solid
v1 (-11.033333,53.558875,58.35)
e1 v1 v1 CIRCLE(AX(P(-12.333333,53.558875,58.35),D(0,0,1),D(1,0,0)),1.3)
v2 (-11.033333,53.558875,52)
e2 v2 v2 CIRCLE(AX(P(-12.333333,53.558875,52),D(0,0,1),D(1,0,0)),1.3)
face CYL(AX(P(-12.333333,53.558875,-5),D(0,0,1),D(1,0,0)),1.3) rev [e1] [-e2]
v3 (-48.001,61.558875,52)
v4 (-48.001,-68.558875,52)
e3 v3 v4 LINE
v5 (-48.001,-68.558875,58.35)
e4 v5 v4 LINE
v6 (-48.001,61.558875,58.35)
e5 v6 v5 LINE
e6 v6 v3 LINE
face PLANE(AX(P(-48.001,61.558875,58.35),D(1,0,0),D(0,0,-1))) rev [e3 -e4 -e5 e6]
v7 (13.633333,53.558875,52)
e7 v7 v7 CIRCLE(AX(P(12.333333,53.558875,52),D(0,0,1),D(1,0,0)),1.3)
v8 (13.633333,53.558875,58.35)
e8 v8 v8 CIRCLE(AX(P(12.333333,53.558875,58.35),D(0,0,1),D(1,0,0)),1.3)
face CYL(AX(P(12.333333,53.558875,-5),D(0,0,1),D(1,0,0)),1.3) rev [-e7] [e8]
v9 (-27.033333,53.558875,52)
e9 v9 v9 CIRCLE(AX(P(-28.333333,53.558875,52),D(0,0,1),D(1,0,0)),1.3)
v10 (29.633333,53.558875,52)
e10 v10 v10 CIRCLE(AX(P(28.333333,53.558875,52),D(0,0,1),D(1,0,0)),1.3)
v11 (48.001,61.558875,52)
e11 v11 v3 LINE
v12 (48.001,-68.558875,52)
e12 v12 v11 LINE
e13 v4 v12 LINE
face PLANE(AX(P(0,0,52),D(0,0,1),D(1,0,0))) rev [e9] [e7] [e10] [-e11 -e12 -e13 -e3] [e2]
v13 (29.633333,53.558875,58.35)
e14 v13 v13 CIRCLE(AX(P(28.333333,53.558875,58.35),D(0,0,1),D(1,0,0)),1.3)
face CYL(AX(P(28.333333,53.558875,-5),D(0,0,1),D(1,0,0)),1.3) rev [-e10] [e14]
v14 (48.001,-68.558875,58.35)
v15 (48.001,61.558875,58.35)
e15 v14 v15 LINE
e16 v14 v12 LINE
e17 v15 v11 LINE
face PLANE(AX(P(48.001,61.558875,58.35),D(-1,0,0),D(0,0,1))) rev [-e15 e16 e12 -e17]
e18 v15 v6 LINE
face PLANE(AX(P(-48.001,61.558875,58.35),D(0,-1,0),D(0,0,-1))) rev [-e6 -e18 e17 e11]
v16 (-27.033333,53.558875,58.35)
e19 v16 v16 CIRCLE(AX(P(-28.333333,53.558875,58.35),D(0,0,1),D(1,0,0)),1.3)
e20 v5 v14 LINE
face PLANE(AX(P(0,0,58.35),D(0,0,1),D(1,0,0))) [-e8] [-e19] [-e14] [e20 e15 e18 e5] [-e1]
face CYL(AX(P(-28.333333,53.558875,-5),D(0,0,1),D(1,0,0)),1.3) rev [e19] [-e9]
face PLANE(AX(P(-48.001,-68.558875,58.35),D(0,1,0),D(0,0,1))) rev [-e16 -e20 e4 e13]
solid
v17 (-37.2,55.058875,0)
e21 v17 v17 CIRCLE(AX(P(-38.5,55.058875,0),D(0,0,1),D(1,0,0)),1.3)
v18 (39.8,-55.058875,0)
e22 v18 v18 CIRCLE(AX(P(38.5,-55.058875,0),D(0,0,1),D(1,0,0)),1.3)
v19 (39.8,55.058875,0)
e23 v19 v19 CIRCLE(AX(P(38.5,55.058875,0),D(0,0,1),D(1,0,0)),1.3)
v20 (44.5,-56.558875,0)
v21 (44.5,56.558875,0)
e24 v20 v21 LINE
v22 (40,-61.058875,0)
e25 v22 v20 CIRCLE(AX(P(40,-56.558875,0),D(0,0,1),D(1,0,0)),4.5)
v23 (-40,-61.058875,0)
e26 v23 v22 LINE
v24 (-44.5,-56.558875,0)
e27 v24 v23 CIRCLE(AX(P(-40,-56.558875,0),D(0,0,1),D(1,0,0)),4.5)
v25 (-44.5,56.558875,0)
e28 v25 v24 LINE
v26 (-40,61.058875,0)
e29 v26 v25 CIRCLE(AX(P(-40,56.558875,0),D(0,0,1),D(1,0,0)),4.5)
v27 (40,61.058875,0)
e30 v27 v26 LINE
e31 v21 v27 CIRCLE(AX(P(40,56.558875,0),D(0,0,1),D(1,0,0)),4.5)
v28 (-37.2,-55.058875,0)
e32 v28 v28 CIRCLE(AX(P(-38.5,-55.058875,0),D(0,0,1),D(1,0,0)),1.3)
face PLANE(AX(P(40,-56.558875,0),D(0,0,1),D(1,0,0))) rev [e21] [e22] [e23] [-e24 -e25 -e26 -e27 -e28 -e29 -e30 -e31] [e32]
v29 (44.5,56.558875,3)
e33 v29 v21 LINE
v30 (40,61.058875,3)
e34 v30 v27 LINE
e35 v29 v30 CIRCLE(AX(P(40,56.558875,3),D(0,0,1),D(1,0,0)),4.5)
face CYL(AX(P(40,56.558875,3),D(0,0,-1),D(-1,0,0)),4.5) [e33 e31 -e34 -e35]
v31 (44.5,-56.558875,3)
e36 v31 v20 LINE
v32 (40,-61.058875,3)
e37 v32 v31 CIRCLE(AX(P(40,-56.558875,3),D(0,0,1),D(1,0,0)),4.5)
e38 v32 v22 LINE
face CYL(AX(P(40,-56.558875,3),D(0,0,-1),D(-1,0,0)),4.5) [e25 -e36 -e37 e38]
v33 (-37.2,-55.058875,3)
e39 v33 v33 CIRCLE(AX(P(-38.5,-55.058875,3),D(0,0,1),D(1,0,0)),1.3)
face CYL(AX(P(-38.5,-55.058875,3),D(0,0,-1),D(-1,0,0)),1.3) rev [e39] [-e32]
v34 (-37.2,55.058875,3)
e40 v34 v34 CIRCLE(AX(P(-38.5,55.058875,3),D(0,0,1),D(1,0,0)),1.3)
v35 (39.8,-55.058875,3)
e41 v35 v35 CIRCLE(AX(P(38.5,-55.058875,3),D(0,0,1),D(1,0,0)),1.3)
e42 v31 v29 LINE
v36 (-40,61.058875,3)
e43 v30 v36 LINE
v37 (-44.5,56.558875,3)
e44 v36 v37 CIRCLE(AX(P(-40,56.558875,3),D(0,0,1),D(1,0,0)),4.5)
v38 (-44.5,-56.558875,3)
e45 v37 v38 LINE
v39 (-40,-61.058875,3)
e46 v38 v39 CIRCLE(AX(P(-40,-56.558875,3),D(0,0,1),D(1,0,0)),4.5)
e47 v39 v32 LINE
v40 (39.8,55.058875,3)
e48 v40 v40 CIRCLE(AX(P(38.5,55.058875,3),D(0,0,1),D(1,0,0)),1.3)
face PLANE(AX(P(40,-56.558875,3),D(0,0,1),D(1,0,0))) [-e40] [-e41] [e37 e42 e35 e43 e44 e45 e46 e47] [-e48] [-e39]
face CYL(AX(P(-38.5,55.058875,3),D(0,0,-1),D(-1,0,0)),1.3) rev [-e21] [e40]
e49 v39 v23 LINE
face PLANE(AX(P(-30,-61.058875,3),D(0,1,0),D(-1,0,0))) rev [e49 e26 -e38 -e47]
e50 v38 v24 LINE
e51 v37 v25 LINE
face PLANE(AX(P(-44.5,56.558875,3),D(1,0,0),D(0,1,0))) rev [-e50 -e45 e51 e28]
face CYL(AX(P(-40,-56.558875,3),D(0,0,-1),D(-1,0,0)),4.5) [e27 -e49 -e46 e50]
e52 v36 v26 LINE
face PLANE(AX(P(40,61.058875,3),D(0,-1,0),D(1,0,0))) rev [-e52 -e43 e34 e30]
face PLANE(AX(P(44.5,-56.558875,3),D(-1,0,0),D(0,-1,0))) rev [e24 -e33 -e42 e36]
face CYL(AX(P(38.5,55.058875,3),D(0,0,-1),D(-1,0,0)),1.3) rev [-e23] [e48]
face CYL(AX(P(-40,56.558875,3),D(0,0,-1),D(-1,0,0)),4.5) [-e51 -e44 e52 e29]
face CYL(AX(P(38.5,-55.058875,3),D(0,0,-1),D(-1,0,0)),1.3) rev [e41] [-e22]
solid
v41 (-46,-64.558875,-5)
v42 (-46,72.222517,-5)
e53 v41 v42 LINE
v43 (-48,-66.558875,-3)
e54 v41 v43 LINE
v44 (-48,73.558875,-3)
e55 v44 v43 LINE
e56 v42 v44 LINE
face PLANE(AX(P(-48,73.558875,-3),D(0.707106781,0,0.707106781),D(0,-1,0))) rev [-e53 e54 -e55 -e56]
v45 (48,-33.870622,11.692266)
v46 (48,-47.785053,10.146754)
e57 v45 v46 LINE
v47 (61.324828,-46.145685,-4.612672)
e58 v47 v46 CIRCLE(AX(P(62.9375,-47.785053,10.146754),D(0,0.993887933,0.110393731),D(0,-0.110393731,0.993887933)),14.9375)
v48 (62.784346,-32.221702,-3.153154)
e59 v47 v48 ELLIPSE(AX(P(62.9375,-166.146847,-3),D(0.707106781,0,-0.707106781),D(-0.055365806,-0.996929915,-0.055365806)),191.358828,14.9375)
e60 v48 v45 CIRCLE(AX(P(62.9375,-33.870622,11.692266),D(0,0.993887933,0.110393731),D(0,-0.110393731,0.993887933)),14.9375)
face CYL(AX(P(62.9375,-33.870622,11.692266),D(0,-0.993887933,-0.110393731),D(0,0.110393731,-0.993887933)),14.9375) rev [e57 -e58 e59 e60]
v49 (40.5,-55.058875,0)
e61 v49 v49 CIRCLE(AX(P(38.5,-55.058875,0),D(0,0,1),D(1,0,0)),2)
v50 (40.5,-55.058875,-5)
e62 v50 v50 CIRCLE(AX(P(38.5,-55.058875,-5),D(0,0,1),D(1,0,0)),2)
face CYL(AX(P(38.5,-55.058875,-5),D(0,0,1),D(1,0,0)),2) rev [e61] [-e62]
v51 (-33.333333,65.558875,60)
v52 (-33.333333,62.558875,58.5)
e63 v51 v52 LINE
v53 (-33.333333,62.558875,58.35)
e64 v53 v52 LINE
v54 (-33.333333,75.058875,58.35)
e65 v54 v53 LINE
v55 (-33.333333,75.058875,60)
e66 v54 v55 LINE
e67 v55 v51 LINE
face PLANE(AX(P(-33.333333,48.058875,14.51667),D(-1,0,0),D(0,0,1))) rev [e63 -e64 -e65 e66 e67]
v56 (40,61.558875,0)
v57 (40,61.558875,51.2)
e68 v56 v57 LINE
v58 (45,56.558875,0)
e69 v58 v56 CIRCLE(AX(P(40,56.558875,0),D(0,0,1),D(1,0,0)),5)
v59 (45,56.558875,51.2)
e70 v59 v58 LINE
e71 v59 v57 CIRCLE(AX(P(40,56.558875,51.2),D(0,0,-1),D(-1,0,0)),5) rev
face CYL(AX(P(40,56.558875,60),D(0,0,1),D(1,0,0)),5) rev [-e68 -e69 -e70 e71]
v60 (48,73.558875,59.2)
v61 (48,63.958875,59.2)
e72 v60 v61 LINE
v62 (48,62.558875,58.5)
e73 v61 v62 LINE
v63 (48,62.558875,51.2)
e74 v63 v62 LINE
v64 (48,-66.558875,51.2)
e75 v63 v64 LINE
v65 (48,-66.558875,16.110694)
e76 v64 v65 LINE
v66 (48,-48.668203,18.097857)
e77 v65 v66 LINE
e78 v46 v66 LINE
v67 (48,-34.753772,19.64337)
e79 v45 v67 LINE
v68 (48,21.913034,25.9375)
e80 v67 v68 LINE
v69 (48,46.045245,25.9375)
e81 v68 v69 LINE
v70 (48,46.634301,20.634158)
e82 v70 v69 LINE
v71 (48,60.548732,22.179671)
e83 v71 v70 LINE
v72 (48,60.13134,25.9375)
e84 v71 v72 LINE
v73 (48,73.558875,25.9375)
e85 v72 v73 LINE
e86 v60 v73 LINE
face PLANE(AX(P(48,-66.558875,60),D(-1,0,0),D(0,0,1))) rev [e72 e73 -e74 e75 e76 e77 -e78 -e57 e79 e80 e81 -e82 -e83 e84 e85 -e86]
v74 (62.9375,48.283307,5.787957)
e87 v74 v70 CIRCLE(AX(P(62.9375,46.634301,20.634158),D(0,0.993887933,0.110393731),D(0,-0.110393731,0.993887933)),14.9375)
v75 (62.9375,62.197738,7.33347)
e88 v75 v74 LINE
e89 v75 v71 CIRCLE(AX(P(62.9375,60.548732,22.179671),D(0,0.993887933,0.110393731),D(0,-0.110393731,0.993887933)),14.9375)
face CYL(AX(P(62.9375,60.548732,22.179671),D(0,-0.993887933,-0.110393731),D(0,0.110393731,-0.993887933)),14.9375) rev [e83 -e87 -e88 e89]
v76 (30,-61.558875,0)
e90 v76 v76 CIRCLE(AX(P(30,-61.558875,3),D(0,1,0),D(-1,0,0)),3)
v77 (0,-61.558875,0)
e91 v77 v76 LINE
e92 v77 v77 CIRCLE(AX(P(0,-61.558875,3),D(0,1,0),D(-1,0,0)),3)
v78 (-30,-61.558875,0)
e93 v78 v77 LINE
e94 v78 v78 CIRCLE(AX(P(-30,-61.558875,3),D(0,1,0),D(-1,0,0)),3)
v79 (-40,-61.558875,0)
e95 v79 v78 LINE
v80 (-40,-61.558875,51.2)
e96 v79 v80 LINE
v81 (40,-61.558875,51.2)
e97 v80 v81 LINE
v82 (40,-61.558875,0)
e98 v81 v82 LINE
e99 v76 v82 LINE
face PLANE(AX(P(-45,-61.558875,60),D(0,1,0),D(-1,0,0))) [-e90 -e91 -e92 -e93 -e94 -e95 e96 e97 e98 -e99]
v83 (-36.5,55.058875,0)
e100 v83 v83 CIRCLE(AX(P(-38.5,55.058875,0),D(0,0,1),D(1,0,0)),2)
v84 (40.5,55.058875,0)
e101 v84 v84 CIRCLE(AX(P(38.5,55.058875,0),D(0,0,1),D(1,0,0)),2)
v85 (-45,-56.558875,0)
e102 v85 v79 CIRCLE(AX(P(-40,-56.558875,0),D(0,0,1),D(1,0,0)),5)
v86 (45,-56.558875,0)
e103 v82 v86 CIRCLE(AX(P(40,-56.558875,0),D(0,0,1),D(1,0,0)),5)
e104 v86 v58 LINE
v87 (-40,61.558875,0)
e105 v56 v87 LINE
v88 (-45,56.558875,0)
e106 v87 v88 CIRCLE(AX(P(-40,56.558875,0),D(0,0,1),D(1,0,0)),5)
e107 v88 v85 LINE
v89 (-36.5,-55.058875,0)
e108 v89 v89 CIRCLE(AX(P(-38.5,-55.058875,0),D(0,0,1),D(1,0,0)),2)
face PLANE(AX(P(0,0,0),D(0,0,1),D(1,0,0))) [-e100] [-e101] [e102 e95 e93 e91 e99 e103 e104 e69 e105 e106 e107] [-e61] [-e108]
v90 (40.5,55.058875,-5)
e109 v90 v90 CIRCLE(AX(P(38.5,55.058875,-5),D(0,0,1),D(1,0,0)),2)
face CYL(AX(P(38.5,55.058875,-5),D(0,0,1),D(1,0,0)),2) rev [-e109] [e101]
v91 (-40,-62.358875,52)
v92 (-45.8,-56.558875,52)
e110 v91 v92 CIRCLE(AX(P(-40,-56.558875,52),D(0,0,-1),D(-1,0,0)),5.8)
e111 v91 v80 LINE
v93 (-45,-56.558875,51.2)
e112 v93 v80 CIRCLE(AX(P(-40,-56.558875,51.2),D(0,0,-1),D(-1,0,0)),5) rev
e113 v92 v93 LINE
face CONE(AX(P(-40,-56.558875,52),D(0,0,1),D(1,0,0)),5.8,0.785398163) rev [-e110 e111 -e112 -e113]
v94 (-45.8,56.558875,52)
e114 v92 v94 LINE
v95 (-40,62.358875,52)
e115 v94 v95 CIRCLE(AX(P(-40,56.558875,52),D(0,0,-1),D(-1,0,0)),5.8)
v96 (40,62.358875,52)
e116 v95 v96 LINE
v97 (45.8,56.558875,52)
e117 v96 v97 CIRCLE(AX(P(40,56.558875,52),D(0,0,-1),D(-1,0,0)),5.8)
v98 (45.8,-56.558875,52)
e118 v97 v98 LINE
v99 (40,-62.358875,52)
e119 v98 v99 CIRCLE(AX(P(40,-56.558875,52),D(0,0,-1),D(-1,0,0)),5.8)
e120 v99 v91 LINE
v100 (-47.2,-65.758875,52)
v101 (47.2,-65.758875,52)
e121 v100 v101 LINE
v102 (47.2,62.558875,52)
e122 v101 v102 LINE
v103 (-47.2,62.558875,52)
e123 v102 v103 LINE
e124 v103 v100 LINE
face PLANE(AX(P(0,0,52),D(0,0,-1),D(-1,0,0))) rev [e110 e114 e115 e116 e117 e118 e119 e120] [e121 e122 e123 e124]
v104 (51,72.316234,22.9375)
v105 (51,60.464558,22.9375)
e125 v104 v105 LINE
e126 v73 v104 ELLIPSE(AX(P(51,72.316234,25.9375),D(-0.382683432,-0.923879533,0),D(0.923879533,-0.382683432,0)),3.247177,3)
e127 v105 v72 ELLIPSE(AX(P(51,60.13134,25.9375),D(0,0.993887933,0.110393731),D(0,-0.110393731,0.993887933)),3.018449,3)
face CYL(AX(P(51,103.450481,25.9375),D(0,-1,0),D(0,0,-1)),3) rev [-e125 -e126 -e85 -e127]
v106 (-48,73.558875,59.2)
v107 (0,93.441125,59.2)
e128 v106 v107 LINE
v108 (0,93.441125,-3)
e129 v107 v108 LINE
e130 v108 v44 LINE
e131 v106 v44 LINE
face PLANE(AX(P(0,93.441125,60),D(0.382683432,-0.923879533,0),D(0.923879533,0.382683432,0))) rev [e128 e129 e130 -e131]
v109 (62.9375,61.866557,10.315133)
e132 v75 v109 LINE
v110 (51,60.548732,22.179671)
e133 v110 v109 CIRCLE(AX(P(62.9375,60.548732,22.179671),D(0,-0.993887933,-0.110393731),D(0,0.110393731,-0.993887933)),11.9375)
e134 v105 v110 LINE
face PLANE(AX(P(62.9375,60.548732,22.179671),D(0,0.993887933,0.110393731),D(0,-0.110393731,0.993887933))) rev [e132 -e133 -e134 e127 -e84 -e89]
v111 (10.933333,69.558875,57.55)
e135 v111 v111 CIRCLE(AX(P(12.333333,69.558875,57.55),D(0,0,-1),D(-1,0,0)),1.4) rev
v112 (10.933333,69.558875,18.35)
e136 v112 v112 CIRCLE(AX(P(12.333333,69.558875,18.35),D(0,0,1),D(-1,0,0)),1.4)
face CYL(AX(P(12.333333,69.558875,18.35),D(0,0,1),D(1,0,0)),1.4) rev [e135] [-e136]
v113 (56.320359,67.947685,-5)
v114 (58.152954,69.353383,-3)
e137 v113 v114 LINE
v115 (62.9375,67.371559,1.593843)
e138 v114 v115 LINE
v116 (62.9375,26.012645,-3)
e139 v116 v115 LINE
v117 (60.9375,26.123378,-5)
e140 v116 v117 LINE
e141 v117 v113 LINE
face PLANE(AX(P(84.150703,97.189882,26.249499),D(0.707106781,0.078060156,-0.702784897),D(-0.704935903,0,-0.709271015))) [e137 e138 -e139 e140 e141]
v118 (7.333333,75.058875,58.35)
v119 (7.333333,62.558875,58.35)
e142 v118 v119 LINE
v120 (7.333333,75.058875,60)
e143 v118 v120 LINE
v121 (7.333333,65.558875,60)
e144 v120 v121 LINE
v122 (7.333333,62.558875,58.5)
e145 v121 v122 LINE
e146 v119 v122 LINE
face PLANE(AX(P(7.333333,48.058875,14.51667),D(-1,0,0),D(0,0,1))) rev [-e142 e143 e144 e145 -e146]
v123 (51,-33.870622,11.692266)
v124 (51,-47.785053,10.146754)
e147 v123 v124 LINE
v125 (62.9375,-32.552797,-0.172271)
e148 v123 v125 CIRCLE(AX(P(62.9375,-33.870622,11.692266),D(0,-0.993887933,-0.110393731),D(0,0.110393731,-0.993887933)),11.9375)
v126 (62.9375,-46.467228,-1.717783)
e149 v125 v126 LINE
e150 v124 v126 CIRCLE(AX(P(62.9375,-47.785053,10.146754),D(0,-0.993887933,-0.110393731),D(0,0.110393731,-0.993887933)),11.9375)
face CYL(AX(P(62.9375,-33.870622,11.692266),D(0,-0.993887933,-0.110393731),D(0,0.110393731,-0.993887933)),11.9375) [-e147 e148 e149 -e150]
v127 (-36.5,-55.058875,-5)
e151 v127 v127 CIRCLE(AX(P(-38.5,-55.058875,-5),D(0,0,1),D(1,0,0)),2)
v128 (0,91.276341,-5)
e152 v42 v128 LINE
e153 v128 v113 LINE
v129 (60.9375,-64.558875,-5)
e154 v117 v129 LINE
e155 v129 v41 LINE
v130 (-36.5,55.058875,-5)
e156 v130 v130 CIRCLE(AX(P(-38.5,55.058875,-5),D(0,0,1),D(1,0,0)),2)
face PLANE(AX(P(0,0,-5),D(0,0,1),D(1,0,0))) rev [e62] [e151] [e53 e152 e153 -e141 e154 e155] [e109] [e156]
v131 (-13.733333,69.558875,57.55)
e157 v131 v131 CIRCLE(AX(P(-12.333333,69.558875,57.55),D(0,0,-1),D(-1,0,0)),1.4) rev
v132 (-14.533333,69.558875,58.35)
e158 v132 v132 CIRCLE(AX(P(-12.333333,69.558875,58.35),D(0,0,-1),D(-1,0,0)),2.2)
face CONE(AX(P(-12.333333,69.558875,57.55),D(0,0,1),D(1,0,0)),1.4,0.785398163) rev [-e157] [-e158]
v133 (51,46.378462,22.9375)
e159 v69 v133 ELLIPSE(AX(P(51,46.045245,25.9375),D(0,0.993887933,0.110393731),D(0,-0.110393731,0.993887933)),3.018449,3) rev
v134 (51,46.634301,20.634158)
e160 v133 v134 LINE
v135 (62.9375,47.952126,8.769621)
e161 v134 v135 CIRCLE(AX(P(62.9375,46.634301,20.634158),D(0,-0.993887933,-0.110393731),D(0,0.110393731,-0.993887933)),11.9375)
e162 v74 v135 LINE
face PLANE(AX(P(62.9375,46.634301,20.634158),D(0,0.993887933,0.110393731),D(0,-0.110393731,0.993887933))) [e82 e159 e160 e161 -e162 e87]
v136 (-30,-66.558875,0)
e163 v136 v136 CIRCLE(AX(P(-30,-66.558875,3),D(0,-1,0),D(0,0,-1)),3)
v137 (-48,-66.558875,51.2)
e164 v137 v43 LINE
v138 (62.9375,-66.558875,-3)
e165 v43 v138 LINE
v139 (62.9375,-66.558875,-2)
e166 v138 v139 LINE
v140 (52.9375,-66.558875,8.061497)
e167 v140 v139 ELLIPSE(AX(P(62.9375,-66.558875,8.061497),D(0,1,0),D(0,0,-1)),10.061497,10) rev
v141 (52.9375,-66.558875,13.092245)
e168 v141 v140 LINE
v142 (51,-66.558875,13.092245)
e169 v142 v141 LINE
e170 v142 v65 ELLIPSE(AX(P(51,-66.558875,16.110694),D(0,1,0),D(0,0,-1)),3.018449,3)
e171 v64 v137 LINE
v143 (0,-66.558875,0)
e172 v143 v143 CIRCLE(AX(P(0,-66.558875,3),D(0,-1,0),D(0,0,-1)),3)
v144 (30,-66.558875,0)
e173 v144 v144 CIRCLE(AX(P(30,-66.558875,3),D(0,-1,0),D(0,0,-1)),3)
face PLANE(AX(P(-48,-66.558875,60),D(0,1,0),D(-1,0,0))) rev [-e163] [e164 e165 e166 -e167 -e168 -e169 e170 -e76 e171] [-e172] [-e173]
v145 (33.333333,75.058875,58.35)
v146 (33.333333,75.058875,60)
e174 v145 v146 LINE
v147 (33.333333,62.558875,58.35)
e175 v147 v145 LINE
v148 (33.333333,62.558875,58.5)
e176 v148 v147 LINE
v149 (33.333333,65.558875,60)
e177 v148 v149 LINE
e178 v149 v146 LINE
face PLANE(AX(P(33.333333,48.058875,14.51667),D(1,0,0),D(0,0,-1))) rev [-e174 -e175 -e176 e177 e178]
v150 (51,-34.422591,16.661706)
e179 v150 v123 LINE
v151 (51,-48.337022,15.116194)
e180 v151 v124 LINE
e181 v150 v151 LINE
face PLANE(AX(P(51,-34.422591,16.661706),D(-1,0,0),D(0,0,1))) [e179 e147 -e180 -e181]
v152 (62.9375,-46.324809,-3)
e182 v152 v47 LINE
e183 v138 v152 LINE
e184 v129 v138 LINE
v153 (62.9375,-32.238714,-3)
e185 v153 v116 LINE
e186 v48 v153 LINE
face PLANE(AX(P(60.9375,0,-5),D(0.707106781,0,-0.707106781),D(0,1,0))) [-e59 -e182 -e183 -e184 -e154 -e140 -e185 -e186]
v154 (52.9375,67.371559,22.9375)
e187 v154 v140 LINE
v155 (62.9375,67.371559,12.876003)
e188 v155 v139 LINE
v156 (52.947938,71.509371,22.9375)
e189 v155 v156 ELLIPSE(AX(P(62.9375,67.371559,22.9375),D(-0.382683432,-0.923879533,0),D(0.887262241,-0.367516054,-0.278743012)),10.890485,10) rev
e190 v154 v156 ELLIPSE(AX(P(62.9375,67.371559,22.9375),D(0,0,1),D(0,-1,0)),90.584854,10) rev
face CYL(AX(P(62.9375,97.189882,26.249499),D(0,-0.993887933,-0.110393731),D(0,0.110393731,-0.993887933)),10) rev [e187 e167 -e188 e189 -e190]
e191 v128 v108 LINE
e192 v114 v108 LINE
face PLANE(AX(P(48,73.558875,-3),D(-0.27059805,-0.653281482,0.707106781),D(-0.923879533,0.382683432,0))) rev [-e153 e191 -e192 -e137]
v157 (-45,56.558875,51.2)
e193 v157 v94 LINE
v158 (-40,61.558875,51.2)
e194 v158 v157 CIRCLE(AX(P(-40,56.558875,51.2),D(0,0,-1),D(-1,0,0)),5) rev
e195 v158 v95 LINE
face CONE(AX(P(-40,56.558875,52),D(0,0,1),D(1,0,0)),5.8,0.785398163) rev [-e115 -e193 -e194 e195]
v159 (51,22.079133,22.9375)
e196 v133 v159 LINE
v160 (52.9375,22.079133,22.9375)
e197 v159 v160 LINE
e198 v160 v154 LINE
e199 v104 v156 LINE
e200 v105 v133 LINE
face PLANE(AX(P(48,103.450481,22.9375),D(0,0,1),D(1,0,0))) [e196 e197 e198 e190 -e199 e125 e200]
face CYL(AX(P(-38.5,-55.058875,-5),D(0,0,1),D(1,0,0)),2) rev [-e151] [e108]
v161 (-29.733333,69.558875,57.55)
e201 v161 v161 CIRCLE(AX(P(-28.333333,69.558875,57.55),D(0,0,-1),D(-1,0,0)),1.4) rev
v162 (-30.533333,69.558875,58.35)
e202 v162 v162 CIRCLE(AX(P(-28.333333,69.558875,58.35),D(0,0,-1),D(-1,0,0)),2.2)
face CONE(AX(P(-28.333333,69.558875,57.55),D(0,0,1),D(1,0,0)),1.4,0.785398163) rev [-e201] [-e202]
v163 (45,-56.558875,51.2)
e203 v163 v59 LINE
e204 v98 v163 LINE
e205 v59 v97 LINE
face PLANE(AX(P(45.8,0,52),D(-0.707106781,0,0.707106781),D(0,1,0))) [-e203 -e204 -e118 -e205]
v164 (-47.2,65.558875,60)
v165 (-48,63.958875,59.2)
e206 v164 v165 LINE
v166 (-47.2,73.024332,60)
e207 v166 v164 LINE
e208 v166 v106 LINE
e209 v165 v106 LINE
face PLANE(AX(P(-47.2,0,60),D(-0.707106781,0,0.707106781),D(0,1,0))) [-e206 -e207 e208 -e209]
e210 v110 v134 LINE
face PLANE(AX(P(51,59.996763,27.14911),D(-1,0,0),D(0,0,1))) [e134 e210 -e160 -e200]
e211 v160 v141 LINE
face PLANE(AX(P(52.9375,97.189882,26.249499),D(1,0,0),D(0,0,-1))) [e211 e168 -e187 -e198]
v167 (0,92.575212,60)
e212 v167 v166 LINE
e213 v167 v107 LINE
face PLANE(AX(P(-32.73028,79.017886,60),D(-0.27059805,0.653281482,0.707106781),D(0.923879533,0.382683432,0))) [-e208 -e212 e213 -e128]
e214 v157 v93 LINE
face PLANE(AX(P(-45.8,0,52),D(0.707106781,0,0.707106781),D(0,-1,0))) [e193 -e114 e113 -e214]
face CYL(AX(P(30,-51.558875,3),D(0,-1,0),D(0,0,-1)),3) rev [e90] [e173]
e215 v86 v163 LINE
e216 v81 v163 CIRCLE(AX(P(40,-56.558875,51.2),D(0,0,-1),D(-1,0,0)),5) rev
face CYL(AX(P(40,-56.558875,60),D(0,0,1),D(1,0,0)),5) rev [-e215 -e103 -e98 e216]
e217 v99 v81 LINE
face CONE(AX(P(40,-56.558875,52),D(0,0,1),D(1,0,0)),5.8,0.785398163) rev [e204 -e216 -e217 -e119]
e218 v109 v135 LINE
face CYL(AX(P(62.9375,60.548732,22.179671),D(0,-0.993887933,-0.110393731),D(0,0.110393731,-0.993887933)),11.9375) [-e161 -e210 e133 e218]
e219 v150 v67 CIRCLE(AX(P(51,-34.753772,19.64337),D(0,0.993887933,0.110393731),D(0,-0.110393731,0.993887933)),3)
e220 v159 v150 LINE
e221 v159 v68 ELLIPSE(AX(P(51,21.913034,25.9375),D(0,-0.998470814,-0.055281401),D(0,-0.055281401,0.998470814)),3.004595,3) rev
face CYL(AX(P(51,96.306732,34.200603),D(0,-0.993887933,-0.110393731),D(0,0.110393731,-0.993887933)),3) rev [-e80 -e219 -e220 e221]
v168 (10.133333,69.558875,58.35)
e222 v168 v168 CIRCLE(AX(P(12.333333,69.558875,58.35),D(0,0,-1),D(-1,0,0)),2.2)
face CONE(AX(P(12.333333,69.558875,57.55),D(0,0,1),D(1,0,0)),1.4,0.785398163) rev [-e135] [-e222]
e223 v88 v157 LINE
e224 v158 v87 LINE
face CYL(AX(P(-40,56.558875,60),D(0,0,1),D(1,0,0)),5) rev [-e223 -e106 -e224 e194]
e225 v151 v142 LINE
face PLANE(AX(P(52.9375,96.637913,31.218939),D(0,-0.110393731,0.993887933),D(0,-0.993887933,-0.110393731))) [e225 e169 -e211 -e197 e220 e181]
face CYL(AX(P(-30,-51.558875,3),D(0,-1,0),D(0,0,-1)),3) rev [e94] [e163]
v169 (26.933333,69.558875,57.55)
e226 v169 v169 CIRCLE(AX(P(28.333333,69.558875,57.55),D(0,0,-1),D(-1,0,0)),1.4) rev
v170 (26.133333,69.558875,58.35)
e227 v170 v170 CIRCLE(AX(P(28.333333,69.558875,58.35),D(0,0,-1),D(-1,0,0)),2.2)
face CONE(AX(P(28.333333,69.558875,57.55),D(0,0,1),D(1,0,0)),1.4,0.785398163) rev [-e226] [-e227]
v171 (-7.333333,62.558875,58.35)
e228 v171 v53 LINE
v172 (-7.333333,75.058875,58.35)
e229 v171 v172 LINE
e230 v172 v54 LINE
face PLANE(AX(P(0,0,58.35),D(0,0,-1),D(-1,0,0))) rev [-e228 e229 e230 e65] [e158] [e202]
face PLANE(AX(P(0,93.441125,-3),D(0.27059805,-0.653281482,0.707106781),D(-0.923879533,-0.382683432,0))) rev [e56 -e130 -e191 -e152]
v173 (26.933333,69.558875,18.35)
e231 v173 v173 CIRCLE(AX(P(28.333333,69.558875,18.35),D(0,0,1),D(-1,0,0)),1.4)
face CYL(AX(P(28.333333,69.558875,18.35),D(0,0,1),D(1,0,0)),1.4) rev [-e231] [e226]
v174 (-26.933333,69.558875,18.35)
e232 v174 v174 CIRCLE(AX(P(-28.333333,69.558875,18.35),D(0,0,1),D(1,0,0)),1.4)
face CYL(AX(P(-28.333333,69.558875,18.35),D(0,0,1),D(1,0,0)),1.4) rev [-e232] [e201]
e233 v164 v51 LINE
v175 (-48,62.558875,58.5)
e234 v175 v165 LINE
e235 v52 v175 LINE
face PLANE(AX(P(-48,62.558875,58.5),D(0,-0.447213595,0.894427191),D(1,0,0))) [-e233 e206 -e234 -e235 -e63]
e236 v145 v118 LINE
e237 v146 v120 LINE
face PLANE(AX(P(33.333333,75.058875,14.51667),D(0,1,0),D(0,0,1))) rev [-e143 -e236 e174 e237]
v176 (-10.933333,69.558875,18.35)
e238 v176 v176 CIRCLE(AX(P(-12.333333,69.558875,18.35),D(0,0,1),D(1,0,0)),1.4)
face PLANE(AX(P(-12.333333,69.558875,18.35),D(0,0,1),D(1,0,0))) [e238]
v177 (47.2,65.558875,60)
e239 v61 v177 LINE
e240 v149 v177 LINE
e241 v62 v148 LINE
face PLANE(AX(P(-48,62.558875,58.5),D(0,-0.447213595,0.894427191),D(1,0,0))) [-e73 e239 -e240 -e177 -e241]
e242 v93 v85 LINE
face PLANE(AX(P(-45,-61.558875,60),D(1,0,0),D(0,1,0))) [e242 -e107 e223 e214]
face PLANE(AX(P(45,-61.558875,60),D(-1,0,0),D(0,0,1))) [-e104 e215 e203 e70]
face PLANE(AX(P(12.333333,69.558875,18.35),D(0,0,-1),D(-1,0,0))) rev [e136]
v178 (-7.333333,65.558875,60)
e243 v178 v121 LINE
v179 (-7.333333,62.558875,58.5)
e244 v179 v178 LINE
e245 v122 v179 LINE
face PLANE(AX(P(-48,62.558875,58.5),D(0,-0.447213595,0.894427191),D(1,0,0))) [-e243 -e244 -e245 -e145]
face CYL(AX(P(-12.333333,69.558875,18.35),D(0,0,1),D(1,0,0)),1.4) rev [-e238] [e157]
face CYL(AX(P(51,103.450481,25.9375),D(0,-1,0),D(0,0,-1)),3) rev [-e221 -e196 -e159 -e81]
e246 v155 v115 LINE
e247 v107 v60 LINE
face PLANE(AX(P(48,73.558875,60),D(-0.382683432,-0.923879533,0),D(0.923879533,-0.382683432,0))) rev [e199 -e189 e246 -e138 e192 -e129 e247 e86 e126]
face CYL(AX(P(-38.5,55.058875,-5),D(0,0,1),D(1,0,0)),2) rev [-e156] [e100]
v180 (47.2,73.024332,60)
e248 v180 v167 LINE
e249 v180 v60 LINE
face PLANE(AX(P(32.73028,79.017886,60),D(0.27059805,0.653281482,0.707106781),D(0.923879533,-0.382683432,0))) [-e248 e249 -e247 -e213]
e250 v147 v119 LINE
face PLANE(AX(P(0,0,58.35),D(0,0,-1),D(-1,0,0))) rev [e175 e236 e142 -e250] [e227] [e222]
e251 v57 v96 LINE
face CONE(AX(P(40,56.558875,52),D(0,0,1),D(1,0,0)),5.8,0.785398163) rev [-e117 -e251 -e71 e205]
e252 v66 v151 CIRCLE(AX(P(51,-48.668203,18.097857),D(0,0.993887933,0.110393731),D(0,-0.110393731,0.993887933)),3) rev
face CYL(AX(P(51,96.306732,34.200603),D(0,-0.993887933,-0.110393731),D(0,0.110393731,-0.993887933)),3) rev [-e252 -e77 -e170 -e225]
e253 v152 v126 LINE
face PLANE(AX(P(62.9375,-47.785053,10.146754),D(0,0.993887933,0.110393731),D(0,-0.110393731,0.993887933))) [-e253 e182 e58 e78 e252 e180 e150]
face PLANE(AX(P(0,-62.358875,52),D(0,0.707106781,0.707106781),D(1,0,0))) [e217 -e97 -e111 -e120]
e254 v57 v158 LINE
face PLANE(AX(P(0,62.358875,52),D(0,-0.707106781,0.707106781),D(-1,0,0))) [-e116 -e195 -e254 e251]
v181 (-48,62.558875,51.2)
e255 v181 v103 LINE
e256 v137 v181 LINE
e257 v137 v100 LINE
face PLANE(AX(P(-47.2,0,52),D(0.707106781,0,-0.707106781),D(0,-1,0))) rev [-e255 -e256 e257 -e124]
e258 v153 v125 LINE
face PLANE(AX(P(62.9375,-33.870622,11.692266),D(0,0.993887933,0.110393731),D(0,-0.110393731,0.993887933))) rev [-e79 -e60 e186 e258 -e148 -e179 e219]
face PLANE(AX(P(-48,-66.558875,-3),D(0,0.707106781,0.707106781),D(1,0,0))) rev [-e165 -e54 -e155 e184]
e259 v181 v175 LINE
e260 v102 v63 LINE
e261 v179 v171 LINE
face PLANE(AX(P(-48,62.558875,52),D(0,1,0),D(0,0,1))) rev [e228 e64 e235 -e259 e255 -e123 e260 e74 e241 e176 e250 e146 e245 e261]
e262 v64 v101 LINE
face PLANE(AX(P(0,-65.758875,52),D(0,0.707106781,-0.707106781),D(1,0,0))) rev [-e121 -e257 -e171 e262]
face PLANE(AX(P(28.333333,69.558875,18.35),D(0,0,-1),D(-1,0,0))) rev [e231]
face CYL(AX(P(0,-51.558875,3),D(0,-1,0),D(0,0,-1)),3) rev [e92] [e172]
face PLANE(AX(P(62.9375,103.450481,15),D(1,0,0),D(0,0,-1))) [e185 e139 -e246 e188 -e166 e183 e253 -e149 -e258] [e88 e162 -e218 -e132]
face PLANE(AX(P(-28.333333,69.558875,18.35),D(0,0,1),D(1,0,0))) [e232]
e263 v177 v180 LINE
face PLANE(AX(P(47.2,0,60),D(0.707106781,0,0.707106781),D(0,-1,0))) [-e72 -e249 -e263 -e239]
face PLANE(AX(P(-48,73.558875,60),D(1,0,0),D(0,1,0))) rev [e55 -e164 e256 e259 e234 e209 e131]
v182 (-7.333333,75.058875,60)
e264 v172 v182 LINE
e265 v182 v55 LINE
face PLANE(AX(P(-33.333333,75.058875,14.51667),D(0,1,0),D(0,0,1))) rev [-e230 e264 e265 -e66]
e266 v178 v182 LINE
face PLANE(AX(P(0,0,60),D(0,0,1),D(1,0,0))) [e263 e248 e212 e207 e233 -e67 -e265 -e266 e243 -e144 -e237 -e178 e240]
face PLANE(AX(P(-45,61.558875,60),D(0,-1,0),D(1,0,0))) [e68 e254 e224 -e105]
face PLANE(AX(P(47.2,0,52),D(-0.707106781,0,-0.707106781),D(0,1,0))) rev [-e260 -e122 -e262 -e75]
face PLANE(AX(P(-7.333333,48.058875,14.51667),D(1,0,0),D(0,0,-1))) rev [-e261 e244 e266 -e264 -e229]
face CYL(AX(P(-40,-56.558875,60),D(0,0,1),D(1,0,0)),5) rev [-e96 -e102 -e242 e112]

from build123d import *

# Parameters (mm, degrees)
SKETCH1_W               = 90
SKETCH1_H               = 123.117749006
MAIN_EXTRUDE_DEPTH      = 60
REAR_EXTRUDE_DEPTH      = 5
BOSS_EXTRUDE3_REACH     = 179.494
CUT_EXTRUDE9_DEPTH      = 203.415334916
CUT_EXTRUDE10_DEPTH     = 14
LPATTERN1_COUNT         = 2
LPATTERN1_PITCH         = 95
FILLET2_R               = 3
SKETCH9_R               = 3
INNER_DRAIN_HOLES_DEPTH = 15
CUT_EXTRUDE2_DEPTH      = 8
SKETCH5_W               = 26
SKETCH5_H               = 27
CUT_EXTRUDE3_DEPTH      = 1.65
SKETCH15_R              = 1.4
CUT_EXTRUDE7_DEPTH      = 40
SKETCH12_W              = 96.002
SKETCH12_H              = 130.117749006
BOSS_EXTRUDE5_DEPTH     = 6.35
SKETCH13_R              = 1.3
CUT_EXTRUDE8_DEPTH      = 130.250127042
CHAMFER4_SIZE           = 3
CHAMFER4_SIZE2          = 1.5
CHAMFER7_SIZE           = 0.8
CAVITY_FILLET_R         = 5
SKETCH21_R              = 1.3
BOSS_EXTRUDE10_DEPTH    = 3
SKETCH22_R              = 2
CUT_EXTRUDE11_DEPTH     = 128.641579591
CHAMFER6_SIZE           = 0.8
CHAMFER2_SIZE           = 2
CHAMFER9_SIZE           = 0.8


with BuildPart() as part:
    # Sketch1 → main-extrude (new body)
    with BuildSketch(Plane.XY):
        Polygon((-48, 73.558874503), (-48, -66.558874503), (48, -66.558874503), (48, 73.558874503), (0, 93.441125497), align=None)
        Rectangle(SKETCH1_W, SKETCH1_H, mode=Mode.SUBTRACT)
    extrude(amount=MAIN_EXTRUDE_DEPTH)

    # Sketch2 → rear-extrude (add)
    with BuildSketch(Plane.XY):
        Polygon((48, -66.558874503), (48, 73.558874503), (0, 93.441125497), (-48, 73.558874503), (-48, -66.558874503), align=None)
    extrude(amount=-REAR_EXTRUDE_DEPTH)

    # Boss-Extrude3: up to this plane
    boss_extrude3_end = Plane(origin=(48, 73.558874503, 60), z_dir=(-0.38268343236508395, -0.9238795325112892, 0))
    # Sketch6 → Boss-Extrude3 (add, up to the surface)
    with BuildSketch(Plane.XZ.offset(66.558874503), mode=Mode.PRIVATE) as boss_extrude3_sk1:
        Polygon((48, 22.9375), (52, 22.9375), (55, 22.9375), (62.9375, 22.9375), (62.9375, 15), (62.9375, -5), (48, -5), align=None)
    boss_extrude3_tool1 = split(extrude(boss_extrude3_sk1.sketch, amount=-BOSS_EXTRUDE3_REACH, mode=Mode.PRIVATE), bisect_by=boss_extrude3_end, keep=Keep.BOTH, mode=Mode.PRIVATE)
    add(boss_extrude3_tool1.solids().sort_by_distance((55.46875, -66.558875, 8.96875))[0])

    # Sketch20 → Cut-Extrude9 (cut, through all)
    with BuildSketch(Plane(origin=(62.9375, -67.662811816, 7.938879334), x_dir=(1, 0, 0), z_dir=(0, 0.9938879333627552, 0.11039373132524995))):
        with BuildLine():
            Line((10, 0), (10, -24.570160676))
            Line((10, -24.570160676), (-14.9375, -24.570160676))
            Line((-14.9375, -24.570160676), (-14.9375, -5))
            Line((-14.9375, -5), (-10, -5))
            Line((-10, -5), (-10, 0))
            ThreePointArc((-10, 0), (0, 10), (10, 0))
        make_face()
        Polygon((21.213203436, 0), (-21.213203436, 42.426406871), (21.213203436, 42.426406871), align=None)
    extrude(amount=CUT_EXTRUDE9_DEPTH, mode=Mode.SUBTRACT)

    # Sketch7 → Cut-Extrude10 (cut)
    with BuildSketch(Plane(origin=(62.9375, -47.785053149, 10.14675396), x_dir=(1, 0, 0), z_dir=(0, 0.9938879333627552, 0.11039373132524995))):
        with BuildLine():
            Line((-14.9375, -15), (-11.9375, -15))
            Line((-11.9375, -15), (-11.9375, -5))
            Line((-11.9375, -5), (-11.9375, 0))
            ThreePointArc((-11.9375, 0), (-8.4410872, 8.4410872), (0, 11.9375))
            Line((0, 11.9375), (10, 11.9375))
            Line((10, 11.9375), (10, 14.9375))
            Line((10, 14.9375), (0, 14.9375))
            ThreePointArc((0, 14.9375), (-10.562407544, 10.562407544), (-14.9375, 0))
            Line((-14.9375, 0), (-14.9375, -15))
        make_face()
    cut_extrude10 = extrude(amount=CUT_EXTRUDE10_DEPTH, mode=Mode.SUBTRACT)

    # LPattern1: Cut-Extrude10 ×2
    with Locations(*[Vector(0, 0.9938879333627553, 0.11039373132525) * (i * LPATTERN1_PITCH) for i in range(1, LPATTERN1_COUNT)]):
        add(cut_extrude10, mode=Mode.SUBTRACT)

    # Fillet2
    fillet2_edges = [part.edges().sort_by_distance(p)[0] for p in [
        (48, 67.011716003, 22.9375),
        (48, 34.228797461, 22.9375),
        (48, -57.447948154, 14.104219216),
        (48, -6.171729083, 19.799602933),
    ]]
    fillet(fillet2_edges, radius=FILLET2_R)

    # Sketch9 → inner-drain-holes (cut)
    with BuildSketch(Plane.XZ.offset(66.558874503)):
        with Locations(Location((-30, 3, 0), (0, 0, 270))):
            Circle(SKETCH9_R)
        with Locations(Location((0, 3, 0), (0, 0, 270))):
            Circle(SKETCH9_R)
        with Locations(Location((30, 3, 0), (0, 0, 270))):
            Circle(SKETCH9_R)
    extrude(amount=-INNER_DRAIN_HOLES_DEPTH, mode=Mode.SUBTRACT)

    # Sketch4 → Cut-Extrude2 (cut)
    with BuildSketch(Plane.XY.offset(60)):
        Polygon((-48, 61.558874503), (-48, -66.558874503), (48, -66.558874503), (48, 61.558874503), (48, 62.558874503), (-48, 62.558874503), align=None)
    extrude(amount=-CUT_EXTRUDE2_DEPTH, mode=Mode.SUBTRACT)

    # Sketch5 → Cut-Extrude3 (cut)
    with BuildSketch(Plane.XY.offset(60)):
        with Locations((-20.333333333, 61.558874503)):
            Rectangle(SKETCH5_W, SKETCH5_H)
        with Locations((20.333333333, 61.558874503)):
            Rectangle(SKETCH5_W, SKETCH5_H)
    extrude(amount=-CUT_EXTRUDE3_DEPTH, mode=Mode.SUBTRACT)

    # Sketch15 → Cut-Extrude7 (cut)
    with BuildSketch(Plane.XY.offset(58.35)):
        with Locations((-28.333333333, 69.558874503)):
            Circle(SKETCH15_R)
        with Locations((-12.333333333, 69.558874503)):
            Circle(SKETCH15_R)
        with Locations(Location((28.333333333, 69.558874503, 0), (0, 0, 180))):
            Circle(SKETCH15_R)
        with Locations(Location((12.333333333, 69.558874503, 0), (0, 0, 180))):
            Circle(SKETCH15_R)
    extrude(amount=-CUT_EXTRUDE7_DEPTH, mode=Mode.SUBTRACT)

    # Chamfer4
    chamfer4_edges = [part.edges().sort_by_distance(p)[0] for p in [
        (40.666666667, 62.558874503, 60),
        (0, 62.558874503, 60),
        (-40.666666667, 62.558874503, 60),
    ]]
    chamfer4_side = [part.faces().sort_by_distance(p)[0] for p in [
        (0, 76.208462952, 60),
    ]]
    chamfer(chamfer4_edges, length=CHAMFER4_SIZE, length2=CHAMFER4_SIZE2, reference=chamfer4_side[0])

    # Chamfer7
    chamfer7_edges = [part.edges().sort_by_distance(p)[0] for p in [
        (-29.733333333, 69.558874503, 58.35),
        (13.733333333, 69.558874503, 58.35),
        (29.733333333, 69.558874503, 58.35),
        (-13.733333333, 69.558874503, 58.35),
    ]]
    chamfer(chamfer7_edges, length=CHAMFER7_SIZE)

    # cavity-fillet
    cavity_fillet_edges = [part.edges().sort_by_distance(p)[0] for p in [
        (-45, -61.558874503, 26),
        (45, -61.558874503, 26),
        (-45, 61.558874503, 26),
        (45, 61.558874503, 26),
    ]]
    fillet(cavity_fillet_edges, radius=CAVITY_FILLET_R)

    # Sketch22 → Cut-Extrude11 (cut, through all)
    with BuildSketch(Plane.XY):
        with Locations((-38.5, 55.058874503)):
            Circle(SKETCH22_R)
        with Locations((38.5, 55.058874503)):
            Circle(SKETCH22_R)
        with Locations((-38.5, -55.058874503)):
            Circle(SKETCH22_R)
        with Locations((38.5, -55.058874503)):
            Circle(SKETCH22_R)
    extrude(amount=-CUT_EXTRUDE11_DEPTH, mode=Mode.SUBTRACT)

    # Chamfer6
    chamfer6_edges = [part.edges().sort_by_distance(p)[0] for p in [
        (48, -2, 52),
        (0, -66.558874503, 52),
        (-48, -2, 52),
        (0, -61.558874503, 52),
        (45, 0, 52),
        (-45, 0, 52),
        (0, 61.558874503, 52),
        (43.535533906, -60.094408409, 52),
        (-43.535533906, -60.094408409, 52),
        (43.535533906, 60.094408409, 52),
        (-43.535533906, 60.094408409, 52),
    ]]
    chamfer(chamfer6_edges, length=CHAMFER6_SIZE)

    # Chamfer2
    # the kernel refuses this chamfer: 2 mm, written as the material it takes off along each edge
    with BuildSketch(Plane(origin=(62.9375, -71.702240479, -5), x_dir=(0, 0, 1), z_dir=(0, 1, 0))) as chamfer2_piece_1:
        Polygon((CHAMFER2_SIZE, 0), (0, -CHAMFER2_SIZE), (0, 0), align=None)
    extrude(amount=105.425477205, mode=Mode.SUBTRACT)
    with BuildSketch(Plane(origin=(-53.143365976, -66.558874503, -5), x_dir=(0, 0, 1), z_dir=(1, 0, 0))) as chamfer2_piece_2:
        Polygon((CHAMFER2_SIZE, 0), (0, -CHAMFER2_SIZE), (0, 0), align=None)
    extrude(amount=121.224231952, mode=Mode.SUBTRACT)
    with BuildSketch(Plane(origin=(-48, 78.702240479, -5), x_dir=(1, 0, 0), z_dir=(0, -1, 0))) as chamfer2_piece_3:
        Polygon((CHAMFER2_SIZE, 0), (0, CHAMFER2_SIZE), (0, 0), align=None)
    extrude(amount=150.404480958, mode=Mode.SUBTRACT)
    with BuildSketch(Plane(origin=(-4.751850553, 95.409406443, -5), x_dir=(0, 0, 1), z_dir=(0.9238795325112892, -0.3826834323650842, 0))) as chamfer2_piece_4:
        Polygon((CHAMFER2_SIZE, 0), (0, CHAMFER2_SIZE), (0, 0), align=None)
    extrude(amount=70.976385497, mode=Mode.SUBTRACT)
    with BuildSketch(Plane(origin=(4.751850553, 95.409406443, -5), x_dir=(0, 0, 1), z_dir=(-0.9238795325112891, -0.3826834323650843, 0))) as chamfer2_piece_5:
        Polygon((CHAMFER2_SIZE, 0), (0, -CHAMFER2_SIZE), (0, 0), align=None)
    extrude(amount=62.241557566, mode=Mode.SUBTRACT)

    # Chamfer9
    chamfer9_edges = [part.edges().sort_by_distance(p)[0] for p in [
        (24, 83.5, 60),
        (48, 69.558874503, 60),
        (-24, 83.5, 60),
        (-48, 69.558874503, 60),
    ]]
    chamfer(chamfer9_edges, length=CHAMFER9_SIZE)


with BuildPart() as body_2:
    # Sketch12 → Boss-Extrude5 (new body)
    with BuildSketch(Plane.XY.offset(52)):
        with Locations((0, -3.5)):
            Rectangle(SKETCH12_W, SKETCH12_H)
    extrude(amount=BOSS_EXTRUDE5_DEPTH)

    # Sketch13 → Cut-Extrude8 (cut, through all)
    with BuildSketch(Plane.XY.offset(58.35)):
        with Locations((-28.333333333, 53.558874503)):
            Circle(SKETCH13_R)
        with Locations((-12.333333333, 53.558874503)):
            Circle(SKETCH13_R)
        with Locations((12.333333333, 53.558874503)):
            Circle(SKETCH13_R)
        with Locations((28.333333333, 53.558874503)):
            Circle(SKETCH13_R)
    extrude(amount=-CUT_EXTRUDE8_DEPTH, mode=Mode.SUBTRACT)


with BuildPart() as body_3:
    # Sketch21 → Boss-Extrude10 (new body)
    with BuildSketch(Plane.XY):
        with BuildLine():
            Line((30, -61.058874503), (40, -61.058874503))
            ThreePointArc((40, -61.058874503), (43.181980515, -59.740855018), (44.5, -56.558874503))
            Line((44.5, -56.558874503), (44.5, 56.558874503))
            ThreePointArc((44.5, 56.558874503), (43.181980515, 59.740855018), (40, 61.058874503))
            Line((40, 61.058874503), (-40, 61.058874503))
            ThreePointArc((-40, 61.058874503), (-43.181980515, 59.740855018), (-44.5, 56.558874503))
            Line((-44.5, 56.558874503), (-44.5, -56.558874503))
            ThreePointArc((-44.5, -56.558874503), (-43.181980515, -59.740855018), (-40, -61.058874503))
            Line((-40, -61.058874503), (-30, -61.058874503))
            Line((-30, -61.058874503), (0, -61.058874503))
            Line((0, -61.058874503), (30, -61.058874503))
        make_face()
        with Locations((-38.5, 55.058874503)):
            Circle(SKETCH21_R, mode=Mode.SUBTRACT)
        with Locations((38.5, 55.058874503)):
            Circle(SKETCH21_R, mode=Mode.SUBTRACT)
        with Locations((-38.5, -55.058874503)):
            Circle(SKETCH21_R, mode=Mode.SUBTRACT)
        with Locations((38.5, -55.058874503)):
            Circle(SKETCH21_R, mode=Mode.SUBTRACT)
    extrude(amount=BOSS_EXTRUDE10_DEPTH)


solid = Compound([part.part, body_2.part, body_3.part])
